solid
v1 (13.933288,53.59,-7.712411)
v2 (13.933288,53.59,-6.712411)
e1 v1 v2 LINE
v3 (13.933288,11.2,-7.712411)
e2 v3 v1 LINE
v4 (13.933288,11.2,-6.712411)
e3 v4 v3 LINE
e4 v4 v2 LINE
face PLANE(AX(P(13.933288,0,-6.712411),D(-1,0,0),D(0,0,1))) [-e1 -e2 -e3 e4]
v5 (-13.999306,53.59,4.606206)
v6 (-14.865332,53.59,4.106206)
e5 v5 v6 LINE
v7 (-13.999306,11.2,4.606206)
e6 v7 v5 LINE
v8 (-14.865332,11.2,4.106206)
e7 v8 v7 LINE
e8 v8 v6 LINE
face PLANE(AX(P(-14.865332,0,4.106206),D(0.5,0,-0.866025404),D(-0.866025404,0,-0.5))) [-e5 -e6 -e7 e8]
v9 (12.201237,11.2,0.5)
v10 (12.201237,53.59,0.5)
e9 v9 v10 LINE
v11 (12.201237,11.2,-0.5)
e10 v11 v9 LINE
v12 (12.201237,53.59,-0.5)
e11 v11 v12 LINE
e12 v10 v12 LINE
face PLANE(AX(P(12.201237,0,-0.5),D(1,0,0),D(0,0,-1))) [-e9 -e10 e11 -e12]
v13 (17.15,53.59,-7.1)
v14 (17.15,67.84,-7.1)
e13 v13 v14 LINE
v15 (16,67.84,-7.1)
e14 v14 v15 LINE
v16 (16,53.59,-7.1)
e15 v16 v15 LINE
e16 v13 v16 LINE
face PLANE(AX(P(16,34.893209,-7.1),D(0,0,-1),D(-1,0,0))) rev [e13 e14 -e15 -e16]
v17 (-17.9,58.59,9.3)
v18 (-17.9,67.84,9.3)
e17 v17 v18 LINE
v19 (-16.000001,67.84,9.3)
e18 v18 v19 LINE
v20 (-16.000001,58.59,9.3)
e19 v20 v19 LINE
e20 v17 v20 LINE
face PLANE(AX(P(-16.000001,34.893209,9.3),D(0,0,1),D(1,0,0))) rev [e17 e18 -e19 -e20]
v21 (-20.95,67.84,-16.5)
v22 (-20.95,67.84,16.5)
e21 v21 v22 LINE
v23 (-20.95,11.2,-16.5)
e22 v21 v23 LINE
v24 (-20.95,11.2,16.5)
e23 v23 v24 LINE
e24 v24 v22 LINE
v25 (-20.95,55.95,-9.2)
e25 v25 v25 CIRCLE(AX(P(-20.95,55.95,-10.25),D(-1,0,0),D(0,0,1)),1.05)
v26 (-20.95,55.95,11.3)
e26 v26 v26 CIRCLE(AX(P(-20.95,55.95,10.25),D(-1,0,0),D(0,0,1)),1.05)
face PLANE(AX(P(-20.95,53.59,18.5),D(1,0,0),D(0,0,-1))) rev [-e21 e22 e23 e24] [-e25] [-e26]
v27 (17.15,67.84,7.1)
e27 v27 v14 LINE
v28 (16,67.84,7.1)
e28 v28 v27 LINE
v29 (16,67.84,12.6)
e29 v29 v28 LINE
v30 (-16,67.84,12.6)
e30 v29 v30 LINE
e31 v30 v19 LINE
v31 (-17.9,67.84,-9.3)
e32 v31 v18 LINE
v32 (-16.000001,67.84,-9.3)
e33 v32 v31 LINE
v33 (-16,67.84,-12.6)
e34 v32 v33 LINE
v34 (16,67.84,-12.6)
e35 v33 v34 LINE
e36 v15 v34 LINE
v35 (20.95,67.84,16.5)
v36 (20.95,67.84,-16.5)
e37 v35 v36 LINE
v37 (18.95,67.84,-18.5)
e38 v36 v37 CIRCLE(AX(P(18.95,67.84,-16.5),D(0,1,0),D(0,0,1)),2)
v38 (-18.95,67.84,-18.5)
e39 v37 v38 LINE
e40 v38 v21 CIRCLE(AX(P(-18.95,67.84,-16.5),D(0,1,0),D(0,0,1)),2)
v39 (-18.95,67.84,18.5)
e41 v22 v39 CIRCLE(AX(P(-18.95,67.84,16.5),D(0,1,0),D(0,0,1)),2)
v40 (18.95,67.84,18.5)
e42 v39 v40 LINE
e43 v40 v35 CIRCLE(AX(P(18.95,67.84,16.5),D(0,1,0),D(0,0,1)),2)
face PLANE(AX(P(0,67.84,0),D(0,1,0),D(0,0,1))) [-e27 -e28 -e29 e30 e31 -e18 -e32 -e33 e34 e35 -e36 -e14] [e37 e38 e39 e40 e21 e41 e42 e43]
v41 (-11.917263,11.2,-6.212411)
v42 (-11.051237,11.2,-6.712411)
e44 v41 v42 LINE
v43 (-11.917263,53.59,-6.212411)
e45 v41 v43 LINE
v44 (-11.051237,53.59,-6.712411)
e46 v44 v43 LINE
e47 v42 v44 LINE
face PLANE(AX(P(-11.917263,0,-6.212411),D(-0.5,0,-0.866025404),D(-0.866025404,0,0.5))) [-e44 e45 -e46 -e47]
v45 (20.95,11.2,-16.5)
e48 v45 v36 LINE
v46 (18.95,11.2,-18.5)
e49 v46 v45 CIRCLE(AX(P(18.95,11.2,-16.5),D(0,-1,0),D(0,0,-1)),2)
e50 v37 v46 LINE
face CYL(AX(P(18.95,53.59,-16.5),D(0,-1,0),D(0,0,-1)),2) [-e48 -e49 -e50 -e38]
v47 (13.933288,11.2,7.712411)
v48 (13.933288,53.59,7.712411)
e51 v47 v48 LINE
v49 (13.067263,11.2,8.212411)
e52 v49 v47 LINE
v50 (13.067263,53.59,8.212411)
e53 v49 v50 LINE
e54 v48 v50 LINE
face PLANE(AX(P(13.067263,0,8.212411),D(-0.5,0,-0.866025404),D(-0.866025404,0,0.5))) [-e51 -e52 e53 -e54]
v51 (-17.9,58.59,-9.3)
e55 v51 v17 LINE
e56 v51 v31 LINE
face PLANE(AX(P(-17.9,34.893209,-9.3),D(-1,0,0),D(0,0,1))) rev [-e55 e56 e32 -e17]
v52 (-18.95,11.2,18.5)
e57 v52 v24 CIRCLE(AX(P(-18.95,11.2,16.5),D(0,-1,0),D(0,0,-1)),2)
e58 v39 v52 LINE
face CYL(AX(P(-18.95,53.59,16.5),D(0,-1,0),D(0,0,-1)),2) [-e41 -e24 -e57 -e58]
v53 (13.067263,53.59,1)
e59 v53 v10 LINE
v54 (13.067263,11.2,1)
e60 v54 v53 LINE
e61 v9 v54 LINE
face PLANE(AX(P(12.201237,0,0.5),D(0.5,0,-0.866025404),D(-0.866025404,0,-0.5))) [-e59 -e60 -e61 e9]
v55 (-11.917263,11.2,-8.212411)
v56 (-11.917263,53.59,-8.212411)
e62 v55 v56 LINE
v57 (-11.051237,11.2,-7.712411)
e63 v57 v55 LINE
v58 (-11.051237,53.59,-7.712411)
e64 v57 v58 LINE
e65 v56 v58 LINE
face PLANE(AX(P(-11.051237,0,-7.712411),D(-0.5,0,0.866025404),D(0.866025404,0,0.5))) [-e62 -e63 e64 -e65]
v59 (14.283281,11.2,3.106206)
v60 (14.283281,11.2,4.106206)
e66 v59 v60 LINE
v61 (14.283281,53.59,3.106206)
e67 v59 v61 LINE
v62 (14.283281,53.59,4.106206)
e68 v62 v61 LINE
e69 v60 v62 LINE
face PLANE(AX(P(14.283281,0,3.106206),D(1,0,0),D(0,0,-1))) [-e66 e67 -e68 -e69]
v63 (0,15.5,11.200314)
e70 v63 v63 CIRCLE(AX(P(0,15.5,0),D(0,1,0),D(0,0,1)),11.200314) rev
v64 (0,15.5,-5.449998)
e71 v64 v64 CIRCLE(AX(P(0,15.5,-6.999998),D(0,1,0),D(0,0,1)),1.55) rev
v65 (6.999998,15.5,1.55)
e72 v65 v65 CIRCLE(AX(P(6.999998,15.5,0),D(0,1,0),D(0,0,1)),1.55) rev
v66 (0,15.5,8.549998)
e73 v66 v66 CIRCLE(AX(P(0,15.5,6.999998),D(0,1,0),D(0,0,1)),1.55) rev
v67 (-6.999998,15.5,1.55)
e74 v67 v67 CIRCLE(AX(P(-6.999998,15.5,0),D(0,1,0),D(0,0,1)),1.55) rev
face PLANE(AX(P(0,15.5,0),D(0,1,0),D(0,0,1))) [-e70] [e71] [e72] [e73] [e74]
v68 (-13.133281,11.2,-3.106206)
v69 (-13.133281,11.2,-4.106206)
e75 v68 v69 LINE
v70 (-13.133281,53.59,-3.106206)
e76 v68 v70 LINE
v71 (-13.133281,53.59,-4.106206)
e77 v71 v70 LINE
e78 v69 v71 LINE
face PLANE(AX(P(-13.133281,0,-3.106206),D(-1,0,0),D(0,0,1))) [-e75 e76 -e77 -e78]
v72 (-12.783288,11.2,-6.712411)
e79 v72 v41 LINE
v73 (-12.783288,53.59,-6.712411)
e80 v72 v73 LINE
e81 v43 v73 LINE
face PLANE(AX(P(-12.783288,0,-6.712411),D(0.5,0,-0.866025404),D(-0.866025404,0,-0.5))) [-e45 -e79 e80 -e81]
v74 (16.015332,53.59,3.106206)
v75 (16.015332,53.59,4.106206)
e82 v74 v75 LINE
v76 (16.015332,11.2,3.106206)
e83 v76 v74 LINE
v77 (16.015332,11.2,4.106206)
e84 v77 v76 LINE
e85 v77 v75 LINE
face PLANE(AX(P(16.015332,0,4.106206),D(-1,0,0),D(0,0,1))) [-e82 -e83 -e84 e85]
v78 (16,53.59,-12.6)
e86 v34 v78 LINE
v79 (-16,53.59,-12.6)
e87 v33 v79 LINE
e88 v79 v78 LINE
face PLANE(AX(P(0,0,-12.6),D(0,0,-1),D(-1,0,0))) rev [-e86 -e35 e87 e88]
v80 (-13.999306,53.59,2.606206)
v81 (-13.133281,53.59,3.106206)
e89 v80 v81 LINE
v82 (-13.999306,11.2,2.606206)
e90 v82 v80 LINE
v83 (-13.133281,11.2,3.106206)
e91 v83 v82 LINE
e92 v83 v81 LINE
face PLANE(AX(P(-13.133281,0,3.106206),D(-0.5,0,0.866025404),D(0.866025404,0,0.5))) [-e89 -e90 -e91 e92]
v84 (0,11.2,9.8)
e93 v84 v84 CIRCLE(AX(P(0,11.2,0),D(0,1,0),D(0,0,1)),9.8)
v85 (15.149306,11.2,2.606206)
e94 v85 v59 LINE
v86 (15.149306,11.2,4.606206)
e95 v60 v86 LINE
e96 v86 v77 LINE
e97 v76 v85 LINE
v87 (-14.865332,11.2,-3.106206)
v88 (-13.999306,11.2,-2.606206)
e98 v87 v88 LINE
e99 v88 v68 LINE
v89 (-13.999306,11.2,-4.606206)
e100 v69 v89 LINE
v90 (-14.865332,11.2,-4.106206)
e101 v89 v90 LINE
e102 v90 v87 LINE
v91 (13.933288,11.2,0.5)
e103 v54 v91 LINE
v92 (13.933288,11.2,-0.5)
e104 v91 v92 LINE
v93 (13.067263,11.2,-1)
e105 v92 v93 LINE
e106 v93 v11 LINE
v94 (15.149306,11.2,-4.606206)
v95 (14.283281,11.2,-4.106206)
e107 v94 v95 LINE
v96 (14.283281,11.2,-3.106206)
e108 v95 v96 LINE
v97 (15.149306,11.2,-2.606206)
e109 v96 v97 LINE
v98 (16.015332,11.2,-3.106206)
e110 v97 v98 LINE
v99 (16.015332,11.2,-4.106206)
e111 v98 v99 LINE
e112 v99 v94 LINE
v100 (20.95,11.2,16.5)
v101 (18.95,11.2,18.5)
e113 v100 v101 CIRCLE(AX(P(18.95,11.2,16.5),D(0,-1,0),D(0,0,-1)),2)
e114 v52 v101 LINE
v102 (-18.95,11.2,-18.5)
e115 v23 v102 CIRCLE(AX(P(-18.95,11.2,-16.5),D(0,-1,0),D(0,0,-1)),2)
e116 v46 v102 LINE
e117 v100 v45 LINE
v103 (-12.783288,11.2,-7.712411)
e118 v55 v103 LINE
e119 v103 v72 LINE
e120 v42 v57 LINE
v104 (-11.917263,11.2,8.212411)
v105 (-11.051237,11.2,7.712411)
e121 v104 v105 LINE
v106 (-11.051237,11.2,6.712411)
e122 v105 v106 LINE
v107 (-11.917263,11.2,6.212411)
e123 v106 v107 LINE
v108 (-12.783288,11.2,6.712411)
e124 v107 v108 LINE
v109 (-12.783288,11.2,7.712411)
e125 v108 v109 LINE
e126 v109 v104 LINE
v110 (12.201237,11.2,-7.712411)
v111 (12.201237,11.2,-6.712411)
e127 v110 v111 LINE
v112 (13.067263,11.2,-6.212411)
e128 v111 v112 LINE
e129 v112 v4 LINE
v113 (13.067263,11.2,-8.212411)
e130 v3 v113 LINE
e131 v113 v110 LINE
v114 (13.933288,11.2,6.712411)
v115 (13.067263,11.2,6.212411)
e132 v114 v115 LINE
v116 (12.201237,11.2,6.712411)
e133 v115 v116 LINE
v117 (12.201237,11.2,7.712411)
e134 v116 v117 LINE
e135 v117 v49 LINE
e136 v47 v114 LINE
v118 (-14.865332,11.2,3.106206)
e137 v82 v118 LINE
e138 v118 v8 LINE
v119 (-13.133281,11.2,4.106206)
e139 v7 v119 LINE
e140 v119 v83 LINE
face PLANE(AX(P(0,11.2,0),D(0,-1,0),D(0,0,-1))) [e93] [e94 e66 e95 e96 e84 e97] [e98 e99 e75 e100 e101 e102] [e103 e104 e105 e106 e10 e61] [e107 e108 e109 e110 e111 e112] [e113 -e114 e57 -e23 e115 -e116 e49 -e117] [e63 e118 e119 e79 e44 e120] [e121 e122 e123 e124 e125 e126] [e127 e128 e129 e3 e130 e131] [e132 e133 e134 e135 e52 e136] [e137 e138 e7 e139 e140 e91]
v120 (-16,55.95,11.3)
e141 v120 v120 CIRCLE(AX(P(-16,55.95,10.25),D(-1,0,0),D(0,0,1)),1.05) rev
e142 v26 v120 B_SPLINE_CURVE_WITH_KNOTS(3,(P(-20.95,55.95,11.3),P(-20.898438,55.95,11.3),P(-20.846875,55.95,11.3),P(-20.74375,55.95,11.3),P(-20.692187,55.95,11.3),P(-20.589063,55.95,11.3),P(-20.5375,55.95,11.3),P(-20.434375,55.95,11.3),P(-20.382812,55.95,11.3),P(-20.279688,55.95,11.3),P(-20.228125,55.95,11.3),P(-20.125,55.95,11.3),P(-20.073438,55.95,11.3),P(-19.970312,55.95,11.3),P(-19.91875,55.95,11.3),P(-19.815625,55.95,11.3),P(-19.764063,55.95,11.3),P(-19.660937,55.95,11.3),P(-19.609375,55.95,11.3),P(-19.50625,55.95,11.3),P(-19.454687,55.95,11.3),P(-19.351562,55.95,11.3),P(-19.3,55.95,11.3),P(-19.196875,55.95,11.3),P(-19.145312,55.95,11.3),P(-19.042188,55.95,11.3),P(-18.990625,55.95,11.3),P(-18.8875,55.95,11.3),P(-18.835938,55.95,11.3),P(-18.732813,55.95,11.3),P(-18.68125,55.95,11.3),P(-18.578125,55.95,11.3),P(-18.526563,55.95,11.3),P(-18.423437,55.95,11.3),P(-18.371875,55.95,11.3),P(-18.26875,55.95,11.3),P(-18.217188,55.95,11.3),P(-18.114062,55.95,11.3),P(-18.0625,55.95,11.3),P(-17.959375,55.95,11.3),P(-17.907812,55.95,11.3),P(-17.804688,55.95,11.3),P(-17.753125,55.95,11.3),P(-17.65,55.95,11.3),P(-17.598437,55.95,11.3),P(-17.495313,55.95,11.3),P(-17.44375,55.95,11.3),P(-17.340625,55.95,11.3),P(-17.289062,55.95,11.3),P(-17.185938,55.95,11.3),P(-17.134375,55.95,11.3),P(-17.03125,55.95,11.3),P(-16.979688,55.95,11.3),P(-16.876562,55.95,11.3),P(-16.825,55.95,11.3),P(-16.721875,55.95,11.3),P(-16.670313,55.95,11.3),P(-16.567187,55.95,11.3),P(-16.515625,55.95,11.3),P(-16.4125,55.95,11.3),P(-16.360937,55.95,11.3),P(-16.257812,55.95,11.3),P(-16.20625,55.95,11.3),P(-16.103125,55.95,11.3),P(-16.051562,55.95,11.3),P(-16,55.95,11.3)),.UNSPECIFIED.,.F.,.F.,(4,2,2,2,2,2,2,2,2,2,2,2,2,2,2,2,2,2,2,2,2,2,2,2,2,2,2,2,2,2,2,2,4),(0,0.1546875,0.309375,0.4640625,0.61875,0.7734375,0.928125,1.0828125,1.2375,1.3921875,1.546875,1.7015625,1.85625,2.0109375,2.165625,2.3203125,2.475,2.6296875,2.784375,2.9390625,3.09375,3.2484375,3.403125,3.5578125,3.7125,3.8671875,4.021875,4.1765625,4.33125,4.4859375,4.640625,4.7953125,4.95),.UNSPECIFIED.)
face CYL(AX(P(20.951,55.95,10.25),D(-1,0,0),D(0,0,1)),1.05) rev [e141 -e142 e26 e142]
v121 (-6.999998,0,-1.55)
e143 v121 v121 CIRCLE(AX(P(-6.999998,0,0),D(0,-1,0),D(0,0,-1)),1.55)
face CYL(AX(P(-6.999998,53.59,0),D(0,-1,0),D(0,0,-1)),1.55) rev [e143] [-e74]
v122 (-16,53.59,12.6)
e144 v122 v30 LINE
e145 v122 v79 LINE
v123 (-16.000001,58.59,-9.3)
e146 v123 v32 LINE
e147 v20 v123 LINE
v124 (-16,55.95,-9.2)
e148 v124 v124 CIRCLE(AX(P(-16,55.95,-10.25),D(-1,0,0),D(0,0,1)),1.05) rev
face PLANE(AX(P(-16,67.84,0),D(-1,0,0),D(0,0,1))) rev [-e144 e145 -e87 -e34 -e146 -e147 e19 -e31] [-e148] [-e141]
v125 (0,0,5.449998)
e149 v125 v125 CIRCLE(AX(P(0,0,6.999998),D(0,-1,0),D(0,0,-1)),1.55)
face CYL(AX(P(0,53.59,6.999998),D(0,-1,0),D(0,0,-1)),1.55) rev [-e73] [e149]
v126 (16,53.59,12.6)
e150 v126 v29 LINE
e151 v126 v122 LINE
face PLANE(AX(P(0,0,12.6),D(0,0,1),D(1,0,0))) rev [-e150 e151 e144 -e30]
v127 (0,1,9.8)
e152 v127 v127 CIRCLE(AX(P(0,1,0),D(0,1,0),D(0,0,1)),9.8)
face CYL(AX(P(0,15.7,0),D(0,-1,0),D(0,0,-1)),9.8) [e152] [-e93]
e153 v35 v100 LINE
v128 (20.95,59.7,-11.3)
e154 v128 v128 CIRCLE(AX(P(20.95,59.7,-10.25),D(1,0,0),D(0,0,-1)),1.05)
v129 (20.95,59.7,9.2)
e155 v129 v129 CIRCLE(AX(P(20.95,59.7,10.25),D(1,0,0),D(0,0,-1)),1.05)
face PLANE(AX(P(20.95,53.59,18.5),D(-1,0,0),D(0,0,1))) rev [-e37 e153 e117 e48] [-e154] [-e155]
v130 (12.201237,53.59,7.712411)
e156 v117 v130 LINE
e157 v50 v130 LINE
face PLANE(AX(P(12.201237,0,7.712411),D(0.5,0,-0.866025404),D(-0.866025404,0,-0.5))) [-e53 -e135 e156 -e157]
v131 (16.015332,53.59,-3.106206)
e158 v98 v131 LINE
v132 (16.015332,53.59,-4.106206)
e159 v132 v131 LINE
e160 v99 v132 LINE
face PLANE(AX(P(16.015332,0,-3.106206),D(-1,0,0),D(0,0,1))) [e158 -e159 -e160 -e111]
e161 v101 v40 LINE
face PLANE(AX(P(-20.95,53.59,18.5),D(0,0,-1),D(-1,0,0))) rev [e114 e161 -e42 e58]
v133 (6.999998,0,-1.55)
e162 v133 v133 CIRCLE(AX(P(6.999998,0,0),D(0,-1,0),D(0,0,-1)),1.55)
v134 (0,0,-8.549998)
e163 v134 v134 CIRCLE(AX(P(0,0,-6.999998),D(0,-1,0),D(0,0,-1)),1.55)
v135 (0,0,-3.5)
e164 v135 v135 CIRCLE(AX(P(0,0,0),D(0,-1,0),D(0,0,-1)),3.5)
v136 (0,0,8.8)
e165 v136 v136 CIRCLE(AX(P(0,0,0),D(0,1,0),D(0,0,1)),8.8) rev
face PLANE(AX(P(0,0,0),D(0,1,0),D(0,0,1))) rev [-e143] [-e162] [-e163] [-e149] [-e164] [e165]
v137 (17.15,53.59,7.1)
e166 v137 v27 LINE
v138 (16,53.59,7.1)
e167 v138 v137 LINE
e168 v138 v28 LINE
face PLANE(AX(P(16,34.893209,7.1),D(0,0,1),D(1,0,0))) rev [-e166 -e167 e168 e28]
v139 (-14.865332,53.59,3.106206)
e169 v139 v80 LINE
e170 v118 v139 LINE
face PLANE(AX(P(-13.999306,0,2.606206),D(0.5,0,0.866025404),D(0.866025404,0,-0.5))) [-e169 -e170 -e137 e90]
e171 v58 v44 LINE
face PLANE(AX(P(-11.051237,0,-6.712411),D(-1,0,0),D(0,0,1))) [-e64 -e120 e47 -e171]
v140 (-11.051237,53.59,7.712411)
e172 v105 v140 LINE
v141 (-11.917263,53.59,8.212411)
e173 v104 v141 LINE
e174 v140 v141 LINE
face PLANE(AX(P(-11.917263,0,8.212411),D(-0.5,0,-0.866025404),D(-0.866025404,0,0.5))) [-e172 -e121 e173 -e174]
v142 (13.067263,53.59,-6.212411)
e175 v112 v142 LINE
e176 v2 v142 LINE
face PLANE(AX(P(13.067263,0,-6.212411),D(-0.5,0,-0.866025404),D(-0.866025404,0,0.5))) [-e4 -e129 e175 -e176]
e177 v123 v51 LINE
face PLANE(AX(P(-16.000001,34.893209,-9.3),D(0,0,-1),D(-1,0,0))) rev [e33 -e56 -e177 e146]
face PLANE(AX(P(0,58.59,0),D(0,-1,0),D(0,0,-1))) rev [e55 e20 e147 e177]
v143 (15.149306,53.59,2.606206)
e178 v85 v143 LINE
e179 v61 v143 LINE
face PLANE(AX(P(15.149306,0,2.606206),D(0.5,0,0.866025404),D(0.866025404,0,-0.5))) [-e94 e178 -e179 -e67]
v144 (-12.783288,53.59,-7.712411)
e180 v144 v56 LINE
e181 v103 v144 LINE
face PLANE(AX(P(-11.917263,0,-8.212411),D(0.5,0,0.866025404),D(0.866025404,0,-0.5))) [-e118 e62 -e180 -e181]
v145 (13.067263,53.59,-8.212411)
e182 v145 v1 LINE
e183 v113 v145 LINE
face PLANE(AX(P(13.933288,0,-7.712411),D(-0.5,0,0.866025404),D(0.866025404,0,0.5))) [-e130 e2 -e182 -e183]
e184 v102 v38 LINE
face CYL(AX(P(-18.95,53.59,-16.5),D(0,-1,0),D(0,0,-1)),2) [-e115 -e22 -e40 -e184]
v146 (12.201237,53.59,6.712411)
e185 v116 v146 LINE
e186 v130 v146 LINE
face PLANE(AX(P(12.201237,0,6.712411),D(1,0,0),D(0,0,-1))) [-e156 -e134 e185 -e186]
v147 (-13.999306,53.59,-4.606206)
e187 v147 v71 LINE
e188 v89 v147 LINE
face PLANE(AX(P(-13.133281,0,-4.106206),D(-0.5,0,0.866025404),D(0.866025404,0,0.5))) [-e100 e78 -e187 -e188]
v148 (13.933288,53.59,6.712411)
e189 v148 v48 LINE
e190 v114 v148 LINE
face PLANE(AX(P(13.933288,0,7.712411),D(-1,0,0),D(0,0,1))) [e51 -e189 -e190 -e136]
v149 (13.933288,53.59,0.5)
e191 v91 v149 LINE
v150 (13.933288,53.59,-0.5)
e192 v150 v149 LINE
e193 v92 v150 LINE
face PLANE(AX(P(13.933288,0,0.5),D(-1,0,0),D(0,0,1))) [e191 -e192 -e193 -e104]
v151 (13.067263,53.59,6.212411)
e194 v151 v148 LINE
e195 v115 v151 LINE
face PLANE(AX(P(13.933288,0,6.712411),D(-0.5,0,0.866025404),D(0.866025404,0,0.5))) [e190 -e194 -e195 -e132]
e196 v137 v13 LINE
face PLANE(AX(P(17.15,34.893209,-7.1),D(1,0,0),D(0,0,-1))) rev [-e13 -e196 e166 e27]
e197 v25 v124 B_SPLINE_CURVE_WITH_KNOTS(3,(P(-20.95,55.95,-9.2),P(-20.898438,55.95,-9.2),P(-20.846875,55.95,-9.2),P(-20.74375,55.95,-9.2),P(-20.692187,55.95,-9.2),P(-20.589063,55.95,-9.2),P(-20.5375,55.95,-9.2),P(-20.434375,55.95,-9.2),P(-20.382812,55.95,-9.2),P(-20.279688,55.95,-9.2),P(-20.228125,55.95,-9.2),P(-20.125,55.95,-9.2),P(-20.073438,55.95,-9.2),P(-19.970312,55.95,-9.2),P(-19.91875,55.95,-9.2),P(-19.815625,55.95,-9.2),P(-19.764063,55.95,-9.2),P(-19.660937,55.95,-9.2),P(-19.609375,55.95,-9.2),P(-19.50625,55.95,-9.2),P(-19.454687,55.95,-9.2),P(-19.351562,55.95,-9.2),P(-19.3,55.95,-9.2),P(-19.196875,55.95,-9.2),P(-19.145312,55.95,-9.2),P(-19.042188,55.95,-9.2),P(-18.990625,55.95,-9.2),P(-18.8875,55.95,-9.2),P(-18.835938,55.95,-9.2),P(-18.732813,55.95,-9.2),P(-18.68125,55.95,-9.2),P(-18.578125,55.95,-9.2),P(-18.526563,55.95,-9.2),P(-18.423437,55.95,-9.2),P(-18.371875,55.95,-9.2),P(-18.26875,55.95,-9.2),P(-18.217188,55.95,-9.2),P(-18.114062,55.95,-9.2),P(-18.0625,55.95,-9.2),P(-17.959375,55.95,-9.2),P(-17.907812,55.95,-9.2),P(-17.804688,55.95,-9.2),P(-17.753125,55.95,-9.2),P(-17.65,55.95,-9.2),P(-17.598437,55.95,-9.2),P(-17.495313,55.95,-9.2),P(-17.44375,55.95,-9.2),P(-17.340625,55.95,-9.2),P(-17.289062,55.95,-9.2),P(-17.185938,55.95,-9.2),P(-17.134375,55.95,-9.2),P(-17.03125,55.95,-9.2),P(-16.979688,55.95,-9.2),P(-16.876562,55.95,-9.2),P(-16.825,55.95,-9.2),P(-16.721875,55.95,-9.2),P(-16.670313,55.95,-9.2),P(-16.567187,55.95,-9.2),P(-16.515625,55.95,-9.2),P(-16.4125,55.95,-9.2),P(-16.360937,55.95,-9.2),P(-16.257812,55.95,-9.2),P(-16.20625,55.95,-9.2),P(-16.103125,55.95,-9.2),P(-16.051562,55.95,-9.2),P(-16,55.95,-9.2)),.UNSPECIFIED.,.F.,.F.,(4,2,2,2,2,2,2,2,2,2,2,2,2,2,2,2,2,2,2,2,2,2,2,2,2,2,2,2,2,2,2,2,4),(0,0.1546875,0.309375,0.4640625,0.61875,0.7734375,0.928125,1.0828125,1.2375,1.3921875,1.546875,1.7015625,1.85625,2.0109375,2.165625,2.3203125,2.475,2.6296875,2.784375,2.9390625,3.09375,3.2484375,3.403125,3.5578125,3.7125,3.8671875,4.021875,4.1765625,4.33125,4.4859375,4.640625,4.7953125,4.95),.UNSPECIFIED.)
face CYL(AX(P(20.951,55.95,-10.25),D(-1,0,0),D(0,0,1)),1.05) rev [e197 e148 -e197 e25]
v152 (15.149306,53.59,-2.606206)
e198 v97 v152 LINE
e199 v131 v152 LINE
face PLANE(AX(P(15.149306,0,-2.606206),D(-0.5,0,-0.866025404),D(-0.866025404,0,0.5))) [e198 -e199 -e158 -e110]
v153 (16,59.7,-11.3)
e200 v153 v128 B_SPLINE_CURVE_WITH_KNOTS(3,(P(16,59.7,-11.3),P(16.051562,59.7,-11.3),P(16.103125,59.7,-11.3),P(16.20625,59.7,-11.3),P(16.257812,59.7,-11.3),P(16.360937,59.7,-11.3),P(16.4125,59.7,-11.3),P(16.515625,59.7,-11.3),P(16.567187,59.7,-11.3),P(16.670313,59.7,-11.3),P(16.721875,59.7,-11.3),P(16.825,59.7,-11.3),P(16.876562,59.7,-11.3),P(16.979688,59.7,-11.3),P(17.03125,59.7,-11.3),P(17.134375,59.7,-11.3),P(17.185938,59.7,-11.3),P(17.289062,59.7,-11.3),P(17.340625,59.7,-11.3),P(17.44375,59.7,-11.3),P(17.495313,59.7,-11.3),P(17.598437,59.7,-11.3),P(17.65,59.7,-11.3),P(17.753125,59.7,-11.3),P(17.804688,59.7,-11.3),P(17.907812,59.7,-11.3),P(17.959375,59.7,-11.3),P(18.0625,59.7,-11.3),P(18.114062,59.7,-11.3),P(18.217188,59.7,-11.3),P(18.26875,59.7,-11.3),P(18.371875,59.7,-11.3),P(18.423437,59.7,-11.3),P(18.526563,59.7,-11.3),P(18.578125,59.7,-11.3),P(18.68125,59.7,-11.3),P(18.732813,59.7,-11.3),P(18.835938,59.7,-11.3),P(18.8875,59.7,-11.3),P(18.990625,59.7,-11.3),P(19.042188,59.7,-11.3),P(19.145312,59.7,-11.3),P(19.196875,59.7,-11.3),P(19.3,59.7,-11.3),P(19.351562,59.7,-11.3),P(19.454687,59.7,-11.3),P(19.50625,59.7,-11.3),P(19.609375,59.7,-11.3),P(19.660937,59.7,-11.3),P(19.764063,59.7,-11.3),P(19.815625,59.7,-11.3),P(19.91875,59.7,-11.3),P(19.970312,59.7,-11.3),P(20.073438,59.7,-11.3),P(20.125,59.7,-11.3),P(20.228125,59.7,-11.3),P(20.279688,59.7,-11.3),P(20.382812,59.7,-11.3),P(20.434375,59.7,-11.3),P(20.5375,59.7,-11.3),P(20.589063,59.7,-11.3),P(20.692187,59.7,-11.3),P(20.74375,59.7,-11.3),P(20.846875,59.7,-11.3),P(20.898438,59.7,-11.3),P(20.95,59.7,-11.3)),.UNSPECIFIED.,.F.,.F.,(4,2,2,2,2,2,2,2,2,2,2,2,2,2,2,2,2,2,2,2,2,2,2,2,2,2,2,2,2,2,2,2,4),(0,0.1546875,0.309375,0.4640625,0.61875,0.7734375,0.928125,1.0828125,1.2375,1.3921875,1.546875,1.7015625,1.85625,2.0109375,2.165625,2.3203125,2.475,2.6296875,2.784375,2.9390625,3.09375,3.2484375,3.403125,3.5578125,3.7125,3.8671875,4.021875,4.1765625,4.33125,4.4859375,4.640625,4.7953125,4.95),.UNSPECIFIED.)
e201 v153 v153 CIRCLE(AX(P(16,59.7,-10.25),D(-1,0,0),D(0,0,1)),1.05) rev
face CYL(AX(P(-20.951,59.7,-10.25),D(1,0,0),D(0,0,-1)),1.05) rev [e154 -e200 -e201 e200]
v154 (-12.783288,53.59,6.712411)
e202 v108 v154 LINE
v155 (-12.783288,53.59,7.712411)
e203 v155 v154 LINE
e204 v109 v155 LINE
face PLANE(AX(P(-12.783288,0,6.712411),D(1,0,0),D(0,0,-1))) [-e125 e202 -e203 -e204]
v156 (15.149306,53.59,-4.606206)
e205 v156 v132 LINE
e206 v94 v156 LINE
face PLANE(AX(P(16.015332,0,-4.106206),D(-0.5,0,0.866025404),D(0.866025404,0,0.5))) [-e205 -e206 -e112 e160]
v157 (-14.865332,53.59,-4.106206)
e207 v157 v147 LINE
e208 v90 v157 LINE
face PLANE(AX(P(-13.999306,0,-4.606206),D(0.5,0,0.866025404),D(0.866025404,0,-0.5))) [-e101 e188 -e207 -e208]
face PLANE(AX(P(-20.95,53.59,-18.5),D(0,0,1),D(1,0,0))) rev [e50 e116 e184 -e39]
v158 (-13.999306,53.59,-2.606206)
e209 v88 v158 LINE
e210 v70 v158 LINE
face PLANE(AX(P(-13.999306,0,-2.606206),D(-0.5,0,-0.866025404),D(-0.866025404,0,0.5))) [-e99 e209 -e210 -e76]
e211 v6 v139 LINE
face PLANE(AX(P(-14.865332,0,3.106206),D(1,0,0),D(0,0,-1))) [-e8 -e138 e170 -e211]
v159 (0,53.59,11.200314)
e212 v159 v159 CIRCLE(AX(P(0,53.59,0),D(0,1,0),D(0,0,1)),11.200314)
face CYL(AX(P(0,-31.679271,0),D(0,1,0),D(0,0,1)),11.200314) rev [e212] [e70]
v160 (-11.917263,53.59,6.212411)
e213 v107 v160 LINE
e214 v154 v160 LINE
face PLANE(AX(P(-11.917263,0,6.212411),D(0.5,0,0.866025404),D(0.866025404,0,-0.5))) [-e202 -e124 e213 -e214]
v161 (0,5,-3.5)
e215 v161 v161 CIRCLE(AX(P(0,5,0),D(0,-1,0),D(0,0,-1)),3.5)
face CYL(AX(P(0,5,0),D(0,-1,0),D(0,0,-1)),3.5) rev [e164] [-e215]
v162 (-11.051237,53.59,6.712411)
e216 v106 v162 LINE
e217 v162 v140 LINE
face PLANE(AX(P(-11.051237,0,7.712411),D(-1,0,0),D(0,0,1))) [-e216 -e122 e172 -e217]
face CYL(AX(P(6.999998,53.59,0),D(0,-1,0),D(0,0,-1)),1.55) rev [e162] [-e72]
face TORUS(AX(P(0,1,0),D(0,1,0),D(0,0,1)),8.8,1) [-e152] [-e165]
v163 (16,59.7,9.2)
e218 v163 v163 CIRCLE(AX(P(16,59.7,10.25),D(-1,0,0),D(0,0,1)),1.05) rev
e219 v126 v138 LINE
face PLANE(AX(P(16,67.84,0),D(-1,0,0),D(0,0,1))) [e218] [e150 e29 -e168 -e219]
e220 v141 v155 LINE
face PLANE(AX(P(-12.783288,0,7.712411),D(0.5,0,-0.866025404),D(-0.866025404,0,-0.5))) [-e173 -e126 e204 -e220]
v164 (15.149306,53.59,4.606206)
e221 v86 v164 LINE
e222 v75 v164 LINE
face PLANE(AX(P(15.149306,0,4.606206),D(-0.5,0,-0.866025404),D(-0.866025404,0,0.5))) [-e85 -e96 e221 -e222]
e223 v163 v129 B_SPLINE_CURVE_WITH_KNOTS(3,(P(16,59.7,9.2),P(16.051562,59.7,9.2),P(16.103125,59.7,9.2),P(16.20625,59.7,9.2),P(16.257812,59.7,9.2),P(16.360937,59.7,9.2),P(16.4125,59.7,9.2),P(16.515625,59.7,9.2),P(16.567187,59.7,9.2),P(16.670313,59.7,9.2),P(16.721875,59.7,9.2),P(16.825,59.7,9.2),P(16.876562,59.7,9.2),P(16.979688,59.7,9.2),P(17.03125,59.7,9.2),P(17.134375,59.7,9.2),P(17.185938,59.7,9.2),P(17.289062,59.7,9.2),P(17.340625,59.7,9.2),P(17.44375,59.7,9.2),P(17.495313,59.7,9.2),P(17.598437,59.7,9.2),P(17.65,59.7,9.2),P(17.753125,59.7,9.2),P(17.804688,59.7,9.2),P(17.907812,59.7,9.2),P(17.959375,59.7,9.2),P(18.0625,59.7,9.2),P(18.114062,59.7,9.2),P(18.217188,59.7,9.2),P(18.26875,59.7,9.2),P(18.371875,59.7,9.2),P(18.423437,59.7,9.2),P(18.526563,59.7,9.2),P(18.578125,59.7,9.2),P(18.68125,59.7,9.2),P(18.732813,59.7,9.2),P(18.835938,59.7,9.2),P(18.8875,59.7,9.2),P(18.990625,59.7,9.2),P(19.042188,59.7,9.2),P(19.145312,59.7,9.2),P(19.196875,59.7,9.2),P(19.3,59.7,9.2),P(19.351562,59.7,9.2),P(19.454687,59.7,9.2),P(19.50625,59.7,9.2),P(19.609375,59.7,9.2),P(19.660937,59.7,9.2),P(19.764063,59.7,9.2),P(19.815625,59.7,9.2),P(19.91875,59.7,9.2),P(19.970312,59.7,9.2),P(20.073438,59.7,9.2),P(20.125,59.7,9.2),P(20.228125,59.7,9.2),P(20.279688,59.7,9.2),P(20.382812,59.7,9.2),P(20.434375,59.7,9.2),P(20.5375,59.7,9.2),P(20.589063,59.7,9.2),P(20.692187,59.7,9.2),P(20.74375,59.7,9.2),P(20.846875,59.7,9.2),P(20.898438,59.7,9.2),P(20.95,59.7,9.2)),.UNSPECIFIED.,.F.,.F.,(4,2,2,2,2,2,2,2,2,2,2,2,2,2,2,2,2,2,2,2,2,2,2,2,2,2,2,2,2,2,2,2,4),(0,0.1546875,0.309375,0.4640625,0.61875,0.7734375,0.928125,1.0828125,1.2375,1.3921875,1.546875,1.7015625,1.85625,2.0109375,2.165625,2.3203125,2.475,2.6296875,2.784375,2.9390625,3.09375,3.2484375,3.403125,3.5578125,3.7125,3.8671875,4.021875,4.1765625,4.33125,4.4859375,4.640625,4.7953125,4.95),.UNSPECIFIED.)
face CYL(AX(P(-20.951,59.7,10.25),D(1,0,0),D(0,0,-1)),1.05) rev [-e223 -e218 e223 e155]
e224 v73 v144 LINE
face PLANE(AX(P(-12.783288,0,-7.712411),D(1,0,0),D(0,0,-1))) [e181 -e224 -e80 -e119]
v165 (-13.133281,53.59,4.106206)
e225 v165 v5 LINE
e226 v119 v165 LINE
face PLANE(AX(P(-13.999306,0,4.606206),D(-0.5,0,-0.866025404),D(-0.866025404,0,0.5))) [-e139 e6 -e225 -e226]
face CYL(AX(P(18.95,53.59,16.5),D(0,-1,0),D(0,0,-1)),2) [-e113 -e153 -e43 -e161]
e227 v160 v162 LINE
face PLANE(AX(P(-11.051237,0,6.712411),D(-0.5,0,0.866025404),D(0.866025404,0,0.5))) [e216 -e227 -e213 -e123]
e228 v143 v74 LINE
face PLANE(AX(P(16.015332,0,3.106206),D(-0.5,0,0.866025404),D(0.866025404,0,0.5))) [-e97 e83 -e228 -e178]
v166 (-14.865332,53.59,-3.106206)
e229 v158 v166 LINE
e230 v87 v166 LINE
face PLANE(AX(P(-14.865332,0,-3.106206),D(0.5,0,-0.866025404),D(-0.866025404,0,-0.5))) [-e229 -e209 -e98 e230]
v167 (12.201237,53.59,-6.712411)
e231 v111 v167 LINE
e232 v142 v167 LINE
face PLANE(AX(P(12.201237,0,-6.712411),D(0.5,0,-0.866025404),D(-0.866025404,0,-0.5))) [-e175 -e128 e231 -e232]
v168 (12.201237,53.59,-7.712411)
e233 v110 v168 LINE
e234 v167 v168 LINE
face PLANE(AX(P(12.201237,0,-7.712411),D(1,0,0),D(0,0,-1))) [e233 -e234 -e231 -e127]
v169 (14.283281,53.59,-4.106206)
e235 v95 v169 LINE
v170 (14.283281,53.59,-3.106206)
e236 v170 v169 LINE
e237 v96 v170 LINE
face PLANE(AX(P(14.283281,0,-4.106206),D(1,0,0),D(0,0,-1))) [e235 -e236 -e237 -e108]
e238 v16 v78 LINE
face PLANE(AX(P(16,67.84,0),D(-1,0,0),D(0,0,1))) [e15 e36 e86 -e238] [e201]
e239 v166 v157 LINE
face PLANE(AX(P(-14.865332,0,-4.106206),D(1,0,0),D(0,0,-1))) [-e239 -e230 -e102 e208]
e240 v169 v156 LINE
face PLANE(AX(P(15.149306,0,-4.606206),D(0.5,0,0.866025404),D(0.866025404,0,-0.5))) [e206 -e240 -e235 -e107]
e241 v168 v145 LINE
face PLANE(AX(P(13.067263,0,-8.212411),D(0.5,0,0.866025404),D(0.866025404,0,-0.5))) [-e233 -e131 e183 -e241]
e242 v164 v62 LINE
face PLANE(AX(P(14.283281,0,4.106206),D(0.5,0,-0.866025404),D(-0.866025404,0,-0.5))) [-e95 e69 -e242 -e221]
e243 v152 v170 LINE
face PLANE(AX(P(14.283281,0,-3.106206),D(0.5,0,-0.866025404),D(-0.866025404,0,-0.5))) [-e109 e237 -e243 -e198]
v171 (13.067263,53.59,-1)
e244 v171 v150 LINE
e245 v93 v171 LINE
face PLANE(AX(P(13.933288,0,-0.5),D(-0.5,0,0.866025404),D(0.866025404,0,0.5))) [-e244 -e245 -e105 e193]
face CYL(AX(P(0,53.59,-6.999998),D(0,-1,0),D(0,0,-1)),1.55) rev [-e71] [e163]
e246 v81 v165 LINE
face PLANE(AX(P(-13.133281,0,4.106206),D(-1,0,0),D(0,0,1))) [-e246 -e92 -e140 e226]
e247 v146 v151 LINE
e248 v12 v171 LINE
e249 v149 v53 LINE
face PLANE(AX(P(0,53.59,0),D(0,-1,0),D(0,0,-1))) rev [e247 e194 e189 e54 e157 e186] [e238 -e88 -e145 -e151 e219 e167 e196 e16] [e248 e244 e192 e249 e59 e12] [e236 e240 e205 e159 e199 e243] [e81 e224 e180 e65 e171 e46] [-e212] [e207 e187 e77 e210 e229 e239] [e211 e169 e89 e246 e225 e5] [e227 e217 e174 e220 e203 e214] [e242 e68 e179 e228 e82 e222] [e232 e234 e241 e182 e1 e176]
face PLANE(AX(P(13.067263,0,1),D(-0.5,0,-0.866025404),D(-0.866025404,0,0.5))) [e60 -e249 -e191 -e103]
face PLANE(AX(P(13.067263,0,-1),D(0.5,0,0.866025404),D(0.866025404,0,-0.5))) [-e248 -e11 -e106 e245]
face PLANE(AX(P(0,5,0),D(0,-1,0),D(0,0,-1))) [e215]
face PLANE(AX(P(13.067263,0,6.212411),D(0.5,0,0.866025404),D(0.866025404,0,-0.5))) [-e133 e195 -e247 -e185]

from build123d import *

# Parameters (mm, degrees)
SKETCH1_R                 = 9.8
BOSS_EXTRUDE1_DEPTH       = 15.7
FILLET1_R                 = 1
SKETCH3_W                 = 41.9
SKETCH3_H                 = 37
BOSS_EXTRUDE2_DEPTH       = 37.89
SKETCH2_R                 = 1.55
CUT_EXTRUDE1_DEPTH        = 61.440388814
SKETCH4_W                 = 4.95
SKETCH4_H                 = 37
BOSS_EXTRUDE3_DEPTH       = 14.25
CUT_EXTRUDE_START         = -14.25
CUT_EXTRUDE_2_OUTLINE_W   = 1.15
CUT_EXTRUDE_2_OUTLINE_H   = 14.2
CUT_EXTRUDE_2_OUTLINE_W_2 = 1.900000227
CUT_EXTRUDE_2_OUTLINE_H_2 = 18.6
CUT_EXTRUDE_2_DEPTH       = 14.25
CUT_EXTRUDE_1_REACH       = 83.854
SKETCH_1_R                = 1.05
CUT_EXTRUDE3_START        = -5
SKETCH6_R                 = 1.41
CUT_EXTRUDE3_DEPTH        = 69.371779997
FILLET5_R                 = 2
MOVE_START                = 11.2
MOVE_FACE_1_OUTLINE_R     = 9.8
MOVE_FACE_1_DEPTH         = 4.5
SKETCH_4_R                = 11.200313663
CUT_EXTRUDE_3_DEPTH       = 38.09
SKETCH_6_W                = 2.268388773
SKETCH_6_H                = 19.352707125
EXTRUDE_1_DEPTH           = 5
CUT_EXTRUDE2_REACH        = 83.854
SKETCH5_R                 = 1.05
SKETCH_7_W                = 33.485055755
SKETCH_7_H                = 15.84059592
EXTRUDE_2_DEPTH           = 5.9
SKETCH_8_W                = 34.098293505
SKETCH_8_H                = 15.557673108
EXTRUDE_3_DEPTH           = 5.9
OTHER_START               = 11.2
OTHER_1_DEPTH             = 42.39
SKETCH_9_R                = 3.5
CUT_EXTRUDE_4_DEPTH       = 5


# Read off the part's stored shape, not the designer's step: 切除-拉伸2, 移动面1, 填充阵列1
with BuildPart() as part:
    # Sketch1 → Boss-Extrude1 (new body)
    with BuildSketch(Plane(origin=(0, 0, 0), x_dir=(1, 0, 0), z_dir=(0, 1, 0))):
        with Locations(Location((0, 0, 0), (0, 0, 270))):
            Circle(SKETCH1_R)
    extrude(amount=BOSS_EXTRUDE1_DEPTH)

    # Fillet1
    fillet1_edges = [part.edges().sort_by_distance(p)[0] for p in [
        (0, 0, -9.8),
    ]]
    fillet(fillet1_edges, radius=FILLET1_R)

    # Sketch3 → Boss-Extrude2 (add)
    with BuildSketch(Plane(origin=(0, 15.7, 0), x_dir=(1, 0, 0), z_dir=(0, 1, 0))):
        Rectangle(SKETCH3_W, SKETCH3_H)
    extrude(amount=BOSS_EXTRUDE2_DEPTH)

    # Sketch2 → Cut-Extrude1 (cut, through all)
    with BuildSketch(Plane(origin=(0, 0, 0), x_dir=(-1, 0, 0), z_dir=(0, -1, 0))):
        with Locations(Location((0, 6.999998127, 0), (0, 0, 90))):
            Circle(SKETCH2_R)
        with Locations(Location((6.999998127, 0, 0), (0, 0, 90))):
            Circle(SKETCH2_R)
        with Locations(Location((0, -6.999998127, 0), (0, 0, 90))):
            Circle(SKETCH2_R)
        with Locations(Location((-6.999998127, 0, 0), (0, 0, 90))):
            Circle(SKETCH2_R)
    extrude(amount=-CUT_EXTRUDE1_DEPTH, mode=Mode.SUBTRACT)

    # Sketch4 → Boss-Extrude3 (add)
    with BuildSketch(Plane(origin=(0, 53.59, 0), x_dir=(1, 0, 0), z_dir=(0, 1, 0))):
        with Locations((-18.475, 0)):
            Rectangle(SKETCH4_W, SKETCH4_H)
        with Locations((18.475, 0)):
            Rectangle(SKETCH4_W, SKETCH4_H)
    extrude(amount=BOSS_EXTRUDE3_DEPTH)

    # 切除-拉伸2 outline → 切除-拉伸2 (cut)
    with BuildSketch(Plane(origin=(0, 67.84, 0), x_dir=(1, 0, 0), z_dir=(0, 1, 0)).offset(CUT_EXTRUDE_START)):
        with Locations((16.575, 0)):
            Rectangle(CUT_EXTRUDE_2_OUTLINE_W, CUT_EXTRUDE_2_OUTLINE_H)
        with Locations((-16.950000113, 0)):
            Rectangle(CUT_EXTRUDE_2_OUTLINE_W_2, CUT_EXTRUDE_2_OUTLINE_H_2)
    extrude(amount=CUT_EXTRUDE_2_DEPTH, mode=Mode.SUBTRACT)

    # 草图1 → 切除-拉伸1 (cut, up to next)
    with BuildSketch(Plane(origin=(20.95, 0, 0), x_dir=(0, 0, -1), z_dir=(1, 0, 0)), mode=Mode.PRIVATE) as cut_extrude_1_sk1:
        with Locations((-10.25, 59.7)):
            Circle(SKETCH_1_R)
    cut_extrude_1_tool1 = extrude(cut_extrude_1_sk1.sketch, amount=-CUT_EXTRUDE_1_REACH, mode=Mode.PRIVATE) & part.part
    # 草图1 → 切除-拉伸1 (cut, up to next)
    with BuildSketch(Plane(origin=(20.95, 0, 0), x_dir=(0, 0, -1), z_dir=(1, 0, 0)), mode=Mode.PRIVATE) as cut_extrude_1_sk2:
        with Locations((10.25, 59.7)):
            Circle(SKETCH_1_R)
    cut_extrude_1_tool2 = extrude(cut_extrude_1_sk2.sketch, amount=-CUT_EXTRUDE_1_REACH, mode=Mode.PRIVATE) & part.part
    add(cut_extrude_1_tool1.solids().sort_by_distance((20.95, 59.7, 10.25))[0], mode=Mode.SUBTRACT)
    add(cut_extrude_1_tool2.solids().sort_by_distance((20.95, 59.7, -10.25))[0], mode=Mode.SUBTRACT)

    # Sketch6 → Cut-Extrude3 (cut, through all)
    with BuildSketch(Plane.XZ.offset(CUT_EXTRUDE3_START)):
        with Locations((0, 6.999998127)):
            Circle(SKETCH6_R)
        with Locations((0, -6.999998127)):
            Circle(SKETCH6_R)
        with Locations((-6.999998127, 0)):
            Circle(SKETCH6_R)
        with Locations((6.999998127, 0)):
            Circle(SKETCH6_R)
    extrude(amount=-CUT_EXTRUDE3_DEPTH, mode=Mode.SUBTRACT)

    # Fillet5
    fillet5_edges = [part.edges().sort_by_distance(p)[0] for p in [
        (20.95, 41.77, -18.5),
        (-20.95, 41.77, -18.5),
        (-20.95, 41.77, 18.5),
        (20.95, 41.77, 18.5),
    ]]
    fillet(fillet5_edges, radius=FILLET5_R)

    # Move Face 1 outline → Move Face 1 (add)
    with BuildSketch(Plane(origin=(0, 0, 0), x_dir=(1, 0, 0), z_dir=(0, 1, 0)).offset(MOVE_START)):
        with BuildLine():
            Line((20.95, -16.5), (20.95, 16.5))
            ThreePointArc((20.95, 16.5), (20.364213562, 17.914213562), (18.95, 18.5))
            Line((18.95, 18.5), (-18.95, 18.5))
            ThreePointArc((-18.95, 18.5), (-20.364213562, 17.914213562), (-20.95, 16.5))
            Line((-20.95, 16.5), (-20.95, -16.5))
            ThreePointArc((-20.95, -16.5), (-20.364213562, -17.914213562), (-18.95, -18.5))
            Line((-18.95, -18.5), (18.95, -18.5))
            ThreePointArc((18.95, -18.5), (20.364213562, -17.914213562), (20.95, -16.5))
        make_face()
        Circle(MOVE_FACE_1_OUTLINE_R, mode=Mode.SUBTRACT)
    extrude(amount=MOVE_FACE_1_DEPTH)

    # 草图4 → 切除-拉伸3 (cut)
    with BuildSketch(Plane(origin=(0, 53.59, 0), x_dir=(1, 0, 0), z_dir=(0, 1, 0))):
        with Locations(Location((0, 0, 0), (0, 0, 270))):
            Circle(SKETCH_4_R)
    extrude(amount=-CUT_EXTRUDE_3_DEPTH, mode=Mode.SUBTRACT)

    # 草图6 → 凸台-拉伸1 (add)
    with BuildSketch(Plane(origin=(0, 53.59, 0), x_dir=(1, 0, 0), z_dir=(0, 1, 0))):
        with Locations((-17.13419541, 0.070716348)):
            Rectangle(SKETCH_6_W, SKETCH_6_H)
    extrude(amount=EXTRUDE_1_DEPTH)

    # Sketch5 → Cut-Extrude2 (cut, up to next)
    with BuildSketch(Plane.ZY.offset(20.95), mode=Mode.PRIVATE) as cut_extrude2_sk1:
        with Locations((-10.25, 55.95)):
            Circle(SKETCH5_R)
    cut_extrude2_tool1 = extrude(cut_extrude2_sk1.sketch, amount=-CUT_EXTRUDE2_REACH, mode=Mode.PRIVATE) & part.part
    # Sketch5 → Cut-Extrude2 (cut, up to next)
    with BuildSketch(Plane.ZY.offset(20.95), mode=Mode.PRIVATE) as cut_extrude2_sk2:
        with Locations((10.25, 55.95)):
            Circle(SKETCH5_R)
    cut_extrude2_tool2 = extrude(cut_extrude2_sk2.sketch, amount=-CUT_EXTRUDE2_REACH, mode=Mode.PRIVATE) & part.part
    add(cut_extrude2_tool1.solids().sort_by_distance((-20.95, 55.95, -10.25))[0], mode=Mode.SUBTRACT)
    add(cut_extrude2_tool2.solids().sort_by_distance((-20.95, 55.95, 10.25))[0], mode=Mode.SUBTRACT)

    # 草图7 → 凸台-拉伸2 (add)
    with BuildSketch(Plane.XY.offset(18.5)):
        with Locations((0.159698038, 59.91970204)):
            Rectangle(SKETCH_7_W, SKETCH_7_H)
    extrude(amount=-EXTRUDE_2_DEPTH)

    # 草图8 → 凸台-拉伸3 (add)
    with BuildSketch(Plane(origin=(0, 0, -18.5), x_dir=(-1, 0, 0), z_dir=(0, 0, -1))):
        with Locations((-0.100853247, 60.061163446)):
            Rectangle(SKETCH_8_W, SKETCH_8_H)
    extrude(amount=-EXTRUDE_3_DEPTH)

    # Other 1 outline → Other 1 (cut)
    with BuildSketch(Plane(origin=(0, 0, 0), x_dir=(1, 0, 0), z_dir=(0, 1, 0)).offset(OTHER_START)):
        Polygon((15.149306373, -4.606205589), (16.015331777, -4.106205589), (16.015331777, -3.106205589), (15.149306373, -2.606205589), (14.283280969, -3.106205589), (14.283280969, -4.106205589), align=None)
        Polygon((16.015331777, 3.106205589), (16.015331777, 4.106205589), (15.149306373, 4.606205589), (14.283280969, 4.106205589), (14.283280969, 3.106205589), (15.149306373, 2.606205589), align=None)
        Polygon((-11.917262605, 6.212411178), (-11.051237202, 6.712411178), (-11.051237202, 7.712411178), (-11.917262605, 8.212411178), (-12.783288009, 7.712411178), (-12.783288009, 6.712411178), align=None)
        Polygon((-11.051237202, -7.712411178), (-11.051237202, -6.712411178), (-11.917262605, -6.212411178), (-12.783288009, -6.712411178), (-12.783288009, -7.712411178), (-11.917262605, -8.212411178), align=None)
        Polygon((13.933288009, -6.712411178), (13.067262605, -6.212411178), (12.201237202, -6.712411178), (12.201237202, -7.712411178), (13.067262605, -8.212411178), (13.933288009, -7.712411178), align=None)
        Polygon((13.933288009, -0.5), (13.933288009, 0.5), (13.067262605, 1), (12.201237202, 0.5), (12.201237202, -0.5), (13.067262605, -1), align=None)
        Polygon((13.933288009, 6.712411178), (13.933288009, 7.712411178), (13.067262605, 8.212411178), (12.201237202, 7.712411178), (12.201237202, 6.712411178), (13.067262605, 6.212411178), align=None)
        Polygon((-13.999306373, 2.606205589), (-13.133280969, 3.106205589), (-13.133280969, 4.106205589), (-13.999306373, 4.606205589), (-14.865331777, 4.106205589), (-14.865331777, 3.106205589), align=None)
        Polygon((-13.133280969, -4.106205589), (-13.133280969, -3.106205589), (-13.999306373, -2.606205589), (-14.865331777, -3.106205589), (-14.865331777, -4.106205589), (-13.999306373, -4.606205589), align=None)
    extrude(amount=OTHER_1_DEPTH, mode=Mode.SUBTRACT)

    # 草图9 → 切除-拉伸4 (cut)
    with BuildSketch(Plane.XZ):
        with Locations(Location((0, 0, 0), (0, 0, 270))):
            Circle(SKETCH_9_R)
    extrude(amount=-CUT_EXTRUDE_4_DEPTH, mode=Mode.SUBTRACT)


solid = part.part
